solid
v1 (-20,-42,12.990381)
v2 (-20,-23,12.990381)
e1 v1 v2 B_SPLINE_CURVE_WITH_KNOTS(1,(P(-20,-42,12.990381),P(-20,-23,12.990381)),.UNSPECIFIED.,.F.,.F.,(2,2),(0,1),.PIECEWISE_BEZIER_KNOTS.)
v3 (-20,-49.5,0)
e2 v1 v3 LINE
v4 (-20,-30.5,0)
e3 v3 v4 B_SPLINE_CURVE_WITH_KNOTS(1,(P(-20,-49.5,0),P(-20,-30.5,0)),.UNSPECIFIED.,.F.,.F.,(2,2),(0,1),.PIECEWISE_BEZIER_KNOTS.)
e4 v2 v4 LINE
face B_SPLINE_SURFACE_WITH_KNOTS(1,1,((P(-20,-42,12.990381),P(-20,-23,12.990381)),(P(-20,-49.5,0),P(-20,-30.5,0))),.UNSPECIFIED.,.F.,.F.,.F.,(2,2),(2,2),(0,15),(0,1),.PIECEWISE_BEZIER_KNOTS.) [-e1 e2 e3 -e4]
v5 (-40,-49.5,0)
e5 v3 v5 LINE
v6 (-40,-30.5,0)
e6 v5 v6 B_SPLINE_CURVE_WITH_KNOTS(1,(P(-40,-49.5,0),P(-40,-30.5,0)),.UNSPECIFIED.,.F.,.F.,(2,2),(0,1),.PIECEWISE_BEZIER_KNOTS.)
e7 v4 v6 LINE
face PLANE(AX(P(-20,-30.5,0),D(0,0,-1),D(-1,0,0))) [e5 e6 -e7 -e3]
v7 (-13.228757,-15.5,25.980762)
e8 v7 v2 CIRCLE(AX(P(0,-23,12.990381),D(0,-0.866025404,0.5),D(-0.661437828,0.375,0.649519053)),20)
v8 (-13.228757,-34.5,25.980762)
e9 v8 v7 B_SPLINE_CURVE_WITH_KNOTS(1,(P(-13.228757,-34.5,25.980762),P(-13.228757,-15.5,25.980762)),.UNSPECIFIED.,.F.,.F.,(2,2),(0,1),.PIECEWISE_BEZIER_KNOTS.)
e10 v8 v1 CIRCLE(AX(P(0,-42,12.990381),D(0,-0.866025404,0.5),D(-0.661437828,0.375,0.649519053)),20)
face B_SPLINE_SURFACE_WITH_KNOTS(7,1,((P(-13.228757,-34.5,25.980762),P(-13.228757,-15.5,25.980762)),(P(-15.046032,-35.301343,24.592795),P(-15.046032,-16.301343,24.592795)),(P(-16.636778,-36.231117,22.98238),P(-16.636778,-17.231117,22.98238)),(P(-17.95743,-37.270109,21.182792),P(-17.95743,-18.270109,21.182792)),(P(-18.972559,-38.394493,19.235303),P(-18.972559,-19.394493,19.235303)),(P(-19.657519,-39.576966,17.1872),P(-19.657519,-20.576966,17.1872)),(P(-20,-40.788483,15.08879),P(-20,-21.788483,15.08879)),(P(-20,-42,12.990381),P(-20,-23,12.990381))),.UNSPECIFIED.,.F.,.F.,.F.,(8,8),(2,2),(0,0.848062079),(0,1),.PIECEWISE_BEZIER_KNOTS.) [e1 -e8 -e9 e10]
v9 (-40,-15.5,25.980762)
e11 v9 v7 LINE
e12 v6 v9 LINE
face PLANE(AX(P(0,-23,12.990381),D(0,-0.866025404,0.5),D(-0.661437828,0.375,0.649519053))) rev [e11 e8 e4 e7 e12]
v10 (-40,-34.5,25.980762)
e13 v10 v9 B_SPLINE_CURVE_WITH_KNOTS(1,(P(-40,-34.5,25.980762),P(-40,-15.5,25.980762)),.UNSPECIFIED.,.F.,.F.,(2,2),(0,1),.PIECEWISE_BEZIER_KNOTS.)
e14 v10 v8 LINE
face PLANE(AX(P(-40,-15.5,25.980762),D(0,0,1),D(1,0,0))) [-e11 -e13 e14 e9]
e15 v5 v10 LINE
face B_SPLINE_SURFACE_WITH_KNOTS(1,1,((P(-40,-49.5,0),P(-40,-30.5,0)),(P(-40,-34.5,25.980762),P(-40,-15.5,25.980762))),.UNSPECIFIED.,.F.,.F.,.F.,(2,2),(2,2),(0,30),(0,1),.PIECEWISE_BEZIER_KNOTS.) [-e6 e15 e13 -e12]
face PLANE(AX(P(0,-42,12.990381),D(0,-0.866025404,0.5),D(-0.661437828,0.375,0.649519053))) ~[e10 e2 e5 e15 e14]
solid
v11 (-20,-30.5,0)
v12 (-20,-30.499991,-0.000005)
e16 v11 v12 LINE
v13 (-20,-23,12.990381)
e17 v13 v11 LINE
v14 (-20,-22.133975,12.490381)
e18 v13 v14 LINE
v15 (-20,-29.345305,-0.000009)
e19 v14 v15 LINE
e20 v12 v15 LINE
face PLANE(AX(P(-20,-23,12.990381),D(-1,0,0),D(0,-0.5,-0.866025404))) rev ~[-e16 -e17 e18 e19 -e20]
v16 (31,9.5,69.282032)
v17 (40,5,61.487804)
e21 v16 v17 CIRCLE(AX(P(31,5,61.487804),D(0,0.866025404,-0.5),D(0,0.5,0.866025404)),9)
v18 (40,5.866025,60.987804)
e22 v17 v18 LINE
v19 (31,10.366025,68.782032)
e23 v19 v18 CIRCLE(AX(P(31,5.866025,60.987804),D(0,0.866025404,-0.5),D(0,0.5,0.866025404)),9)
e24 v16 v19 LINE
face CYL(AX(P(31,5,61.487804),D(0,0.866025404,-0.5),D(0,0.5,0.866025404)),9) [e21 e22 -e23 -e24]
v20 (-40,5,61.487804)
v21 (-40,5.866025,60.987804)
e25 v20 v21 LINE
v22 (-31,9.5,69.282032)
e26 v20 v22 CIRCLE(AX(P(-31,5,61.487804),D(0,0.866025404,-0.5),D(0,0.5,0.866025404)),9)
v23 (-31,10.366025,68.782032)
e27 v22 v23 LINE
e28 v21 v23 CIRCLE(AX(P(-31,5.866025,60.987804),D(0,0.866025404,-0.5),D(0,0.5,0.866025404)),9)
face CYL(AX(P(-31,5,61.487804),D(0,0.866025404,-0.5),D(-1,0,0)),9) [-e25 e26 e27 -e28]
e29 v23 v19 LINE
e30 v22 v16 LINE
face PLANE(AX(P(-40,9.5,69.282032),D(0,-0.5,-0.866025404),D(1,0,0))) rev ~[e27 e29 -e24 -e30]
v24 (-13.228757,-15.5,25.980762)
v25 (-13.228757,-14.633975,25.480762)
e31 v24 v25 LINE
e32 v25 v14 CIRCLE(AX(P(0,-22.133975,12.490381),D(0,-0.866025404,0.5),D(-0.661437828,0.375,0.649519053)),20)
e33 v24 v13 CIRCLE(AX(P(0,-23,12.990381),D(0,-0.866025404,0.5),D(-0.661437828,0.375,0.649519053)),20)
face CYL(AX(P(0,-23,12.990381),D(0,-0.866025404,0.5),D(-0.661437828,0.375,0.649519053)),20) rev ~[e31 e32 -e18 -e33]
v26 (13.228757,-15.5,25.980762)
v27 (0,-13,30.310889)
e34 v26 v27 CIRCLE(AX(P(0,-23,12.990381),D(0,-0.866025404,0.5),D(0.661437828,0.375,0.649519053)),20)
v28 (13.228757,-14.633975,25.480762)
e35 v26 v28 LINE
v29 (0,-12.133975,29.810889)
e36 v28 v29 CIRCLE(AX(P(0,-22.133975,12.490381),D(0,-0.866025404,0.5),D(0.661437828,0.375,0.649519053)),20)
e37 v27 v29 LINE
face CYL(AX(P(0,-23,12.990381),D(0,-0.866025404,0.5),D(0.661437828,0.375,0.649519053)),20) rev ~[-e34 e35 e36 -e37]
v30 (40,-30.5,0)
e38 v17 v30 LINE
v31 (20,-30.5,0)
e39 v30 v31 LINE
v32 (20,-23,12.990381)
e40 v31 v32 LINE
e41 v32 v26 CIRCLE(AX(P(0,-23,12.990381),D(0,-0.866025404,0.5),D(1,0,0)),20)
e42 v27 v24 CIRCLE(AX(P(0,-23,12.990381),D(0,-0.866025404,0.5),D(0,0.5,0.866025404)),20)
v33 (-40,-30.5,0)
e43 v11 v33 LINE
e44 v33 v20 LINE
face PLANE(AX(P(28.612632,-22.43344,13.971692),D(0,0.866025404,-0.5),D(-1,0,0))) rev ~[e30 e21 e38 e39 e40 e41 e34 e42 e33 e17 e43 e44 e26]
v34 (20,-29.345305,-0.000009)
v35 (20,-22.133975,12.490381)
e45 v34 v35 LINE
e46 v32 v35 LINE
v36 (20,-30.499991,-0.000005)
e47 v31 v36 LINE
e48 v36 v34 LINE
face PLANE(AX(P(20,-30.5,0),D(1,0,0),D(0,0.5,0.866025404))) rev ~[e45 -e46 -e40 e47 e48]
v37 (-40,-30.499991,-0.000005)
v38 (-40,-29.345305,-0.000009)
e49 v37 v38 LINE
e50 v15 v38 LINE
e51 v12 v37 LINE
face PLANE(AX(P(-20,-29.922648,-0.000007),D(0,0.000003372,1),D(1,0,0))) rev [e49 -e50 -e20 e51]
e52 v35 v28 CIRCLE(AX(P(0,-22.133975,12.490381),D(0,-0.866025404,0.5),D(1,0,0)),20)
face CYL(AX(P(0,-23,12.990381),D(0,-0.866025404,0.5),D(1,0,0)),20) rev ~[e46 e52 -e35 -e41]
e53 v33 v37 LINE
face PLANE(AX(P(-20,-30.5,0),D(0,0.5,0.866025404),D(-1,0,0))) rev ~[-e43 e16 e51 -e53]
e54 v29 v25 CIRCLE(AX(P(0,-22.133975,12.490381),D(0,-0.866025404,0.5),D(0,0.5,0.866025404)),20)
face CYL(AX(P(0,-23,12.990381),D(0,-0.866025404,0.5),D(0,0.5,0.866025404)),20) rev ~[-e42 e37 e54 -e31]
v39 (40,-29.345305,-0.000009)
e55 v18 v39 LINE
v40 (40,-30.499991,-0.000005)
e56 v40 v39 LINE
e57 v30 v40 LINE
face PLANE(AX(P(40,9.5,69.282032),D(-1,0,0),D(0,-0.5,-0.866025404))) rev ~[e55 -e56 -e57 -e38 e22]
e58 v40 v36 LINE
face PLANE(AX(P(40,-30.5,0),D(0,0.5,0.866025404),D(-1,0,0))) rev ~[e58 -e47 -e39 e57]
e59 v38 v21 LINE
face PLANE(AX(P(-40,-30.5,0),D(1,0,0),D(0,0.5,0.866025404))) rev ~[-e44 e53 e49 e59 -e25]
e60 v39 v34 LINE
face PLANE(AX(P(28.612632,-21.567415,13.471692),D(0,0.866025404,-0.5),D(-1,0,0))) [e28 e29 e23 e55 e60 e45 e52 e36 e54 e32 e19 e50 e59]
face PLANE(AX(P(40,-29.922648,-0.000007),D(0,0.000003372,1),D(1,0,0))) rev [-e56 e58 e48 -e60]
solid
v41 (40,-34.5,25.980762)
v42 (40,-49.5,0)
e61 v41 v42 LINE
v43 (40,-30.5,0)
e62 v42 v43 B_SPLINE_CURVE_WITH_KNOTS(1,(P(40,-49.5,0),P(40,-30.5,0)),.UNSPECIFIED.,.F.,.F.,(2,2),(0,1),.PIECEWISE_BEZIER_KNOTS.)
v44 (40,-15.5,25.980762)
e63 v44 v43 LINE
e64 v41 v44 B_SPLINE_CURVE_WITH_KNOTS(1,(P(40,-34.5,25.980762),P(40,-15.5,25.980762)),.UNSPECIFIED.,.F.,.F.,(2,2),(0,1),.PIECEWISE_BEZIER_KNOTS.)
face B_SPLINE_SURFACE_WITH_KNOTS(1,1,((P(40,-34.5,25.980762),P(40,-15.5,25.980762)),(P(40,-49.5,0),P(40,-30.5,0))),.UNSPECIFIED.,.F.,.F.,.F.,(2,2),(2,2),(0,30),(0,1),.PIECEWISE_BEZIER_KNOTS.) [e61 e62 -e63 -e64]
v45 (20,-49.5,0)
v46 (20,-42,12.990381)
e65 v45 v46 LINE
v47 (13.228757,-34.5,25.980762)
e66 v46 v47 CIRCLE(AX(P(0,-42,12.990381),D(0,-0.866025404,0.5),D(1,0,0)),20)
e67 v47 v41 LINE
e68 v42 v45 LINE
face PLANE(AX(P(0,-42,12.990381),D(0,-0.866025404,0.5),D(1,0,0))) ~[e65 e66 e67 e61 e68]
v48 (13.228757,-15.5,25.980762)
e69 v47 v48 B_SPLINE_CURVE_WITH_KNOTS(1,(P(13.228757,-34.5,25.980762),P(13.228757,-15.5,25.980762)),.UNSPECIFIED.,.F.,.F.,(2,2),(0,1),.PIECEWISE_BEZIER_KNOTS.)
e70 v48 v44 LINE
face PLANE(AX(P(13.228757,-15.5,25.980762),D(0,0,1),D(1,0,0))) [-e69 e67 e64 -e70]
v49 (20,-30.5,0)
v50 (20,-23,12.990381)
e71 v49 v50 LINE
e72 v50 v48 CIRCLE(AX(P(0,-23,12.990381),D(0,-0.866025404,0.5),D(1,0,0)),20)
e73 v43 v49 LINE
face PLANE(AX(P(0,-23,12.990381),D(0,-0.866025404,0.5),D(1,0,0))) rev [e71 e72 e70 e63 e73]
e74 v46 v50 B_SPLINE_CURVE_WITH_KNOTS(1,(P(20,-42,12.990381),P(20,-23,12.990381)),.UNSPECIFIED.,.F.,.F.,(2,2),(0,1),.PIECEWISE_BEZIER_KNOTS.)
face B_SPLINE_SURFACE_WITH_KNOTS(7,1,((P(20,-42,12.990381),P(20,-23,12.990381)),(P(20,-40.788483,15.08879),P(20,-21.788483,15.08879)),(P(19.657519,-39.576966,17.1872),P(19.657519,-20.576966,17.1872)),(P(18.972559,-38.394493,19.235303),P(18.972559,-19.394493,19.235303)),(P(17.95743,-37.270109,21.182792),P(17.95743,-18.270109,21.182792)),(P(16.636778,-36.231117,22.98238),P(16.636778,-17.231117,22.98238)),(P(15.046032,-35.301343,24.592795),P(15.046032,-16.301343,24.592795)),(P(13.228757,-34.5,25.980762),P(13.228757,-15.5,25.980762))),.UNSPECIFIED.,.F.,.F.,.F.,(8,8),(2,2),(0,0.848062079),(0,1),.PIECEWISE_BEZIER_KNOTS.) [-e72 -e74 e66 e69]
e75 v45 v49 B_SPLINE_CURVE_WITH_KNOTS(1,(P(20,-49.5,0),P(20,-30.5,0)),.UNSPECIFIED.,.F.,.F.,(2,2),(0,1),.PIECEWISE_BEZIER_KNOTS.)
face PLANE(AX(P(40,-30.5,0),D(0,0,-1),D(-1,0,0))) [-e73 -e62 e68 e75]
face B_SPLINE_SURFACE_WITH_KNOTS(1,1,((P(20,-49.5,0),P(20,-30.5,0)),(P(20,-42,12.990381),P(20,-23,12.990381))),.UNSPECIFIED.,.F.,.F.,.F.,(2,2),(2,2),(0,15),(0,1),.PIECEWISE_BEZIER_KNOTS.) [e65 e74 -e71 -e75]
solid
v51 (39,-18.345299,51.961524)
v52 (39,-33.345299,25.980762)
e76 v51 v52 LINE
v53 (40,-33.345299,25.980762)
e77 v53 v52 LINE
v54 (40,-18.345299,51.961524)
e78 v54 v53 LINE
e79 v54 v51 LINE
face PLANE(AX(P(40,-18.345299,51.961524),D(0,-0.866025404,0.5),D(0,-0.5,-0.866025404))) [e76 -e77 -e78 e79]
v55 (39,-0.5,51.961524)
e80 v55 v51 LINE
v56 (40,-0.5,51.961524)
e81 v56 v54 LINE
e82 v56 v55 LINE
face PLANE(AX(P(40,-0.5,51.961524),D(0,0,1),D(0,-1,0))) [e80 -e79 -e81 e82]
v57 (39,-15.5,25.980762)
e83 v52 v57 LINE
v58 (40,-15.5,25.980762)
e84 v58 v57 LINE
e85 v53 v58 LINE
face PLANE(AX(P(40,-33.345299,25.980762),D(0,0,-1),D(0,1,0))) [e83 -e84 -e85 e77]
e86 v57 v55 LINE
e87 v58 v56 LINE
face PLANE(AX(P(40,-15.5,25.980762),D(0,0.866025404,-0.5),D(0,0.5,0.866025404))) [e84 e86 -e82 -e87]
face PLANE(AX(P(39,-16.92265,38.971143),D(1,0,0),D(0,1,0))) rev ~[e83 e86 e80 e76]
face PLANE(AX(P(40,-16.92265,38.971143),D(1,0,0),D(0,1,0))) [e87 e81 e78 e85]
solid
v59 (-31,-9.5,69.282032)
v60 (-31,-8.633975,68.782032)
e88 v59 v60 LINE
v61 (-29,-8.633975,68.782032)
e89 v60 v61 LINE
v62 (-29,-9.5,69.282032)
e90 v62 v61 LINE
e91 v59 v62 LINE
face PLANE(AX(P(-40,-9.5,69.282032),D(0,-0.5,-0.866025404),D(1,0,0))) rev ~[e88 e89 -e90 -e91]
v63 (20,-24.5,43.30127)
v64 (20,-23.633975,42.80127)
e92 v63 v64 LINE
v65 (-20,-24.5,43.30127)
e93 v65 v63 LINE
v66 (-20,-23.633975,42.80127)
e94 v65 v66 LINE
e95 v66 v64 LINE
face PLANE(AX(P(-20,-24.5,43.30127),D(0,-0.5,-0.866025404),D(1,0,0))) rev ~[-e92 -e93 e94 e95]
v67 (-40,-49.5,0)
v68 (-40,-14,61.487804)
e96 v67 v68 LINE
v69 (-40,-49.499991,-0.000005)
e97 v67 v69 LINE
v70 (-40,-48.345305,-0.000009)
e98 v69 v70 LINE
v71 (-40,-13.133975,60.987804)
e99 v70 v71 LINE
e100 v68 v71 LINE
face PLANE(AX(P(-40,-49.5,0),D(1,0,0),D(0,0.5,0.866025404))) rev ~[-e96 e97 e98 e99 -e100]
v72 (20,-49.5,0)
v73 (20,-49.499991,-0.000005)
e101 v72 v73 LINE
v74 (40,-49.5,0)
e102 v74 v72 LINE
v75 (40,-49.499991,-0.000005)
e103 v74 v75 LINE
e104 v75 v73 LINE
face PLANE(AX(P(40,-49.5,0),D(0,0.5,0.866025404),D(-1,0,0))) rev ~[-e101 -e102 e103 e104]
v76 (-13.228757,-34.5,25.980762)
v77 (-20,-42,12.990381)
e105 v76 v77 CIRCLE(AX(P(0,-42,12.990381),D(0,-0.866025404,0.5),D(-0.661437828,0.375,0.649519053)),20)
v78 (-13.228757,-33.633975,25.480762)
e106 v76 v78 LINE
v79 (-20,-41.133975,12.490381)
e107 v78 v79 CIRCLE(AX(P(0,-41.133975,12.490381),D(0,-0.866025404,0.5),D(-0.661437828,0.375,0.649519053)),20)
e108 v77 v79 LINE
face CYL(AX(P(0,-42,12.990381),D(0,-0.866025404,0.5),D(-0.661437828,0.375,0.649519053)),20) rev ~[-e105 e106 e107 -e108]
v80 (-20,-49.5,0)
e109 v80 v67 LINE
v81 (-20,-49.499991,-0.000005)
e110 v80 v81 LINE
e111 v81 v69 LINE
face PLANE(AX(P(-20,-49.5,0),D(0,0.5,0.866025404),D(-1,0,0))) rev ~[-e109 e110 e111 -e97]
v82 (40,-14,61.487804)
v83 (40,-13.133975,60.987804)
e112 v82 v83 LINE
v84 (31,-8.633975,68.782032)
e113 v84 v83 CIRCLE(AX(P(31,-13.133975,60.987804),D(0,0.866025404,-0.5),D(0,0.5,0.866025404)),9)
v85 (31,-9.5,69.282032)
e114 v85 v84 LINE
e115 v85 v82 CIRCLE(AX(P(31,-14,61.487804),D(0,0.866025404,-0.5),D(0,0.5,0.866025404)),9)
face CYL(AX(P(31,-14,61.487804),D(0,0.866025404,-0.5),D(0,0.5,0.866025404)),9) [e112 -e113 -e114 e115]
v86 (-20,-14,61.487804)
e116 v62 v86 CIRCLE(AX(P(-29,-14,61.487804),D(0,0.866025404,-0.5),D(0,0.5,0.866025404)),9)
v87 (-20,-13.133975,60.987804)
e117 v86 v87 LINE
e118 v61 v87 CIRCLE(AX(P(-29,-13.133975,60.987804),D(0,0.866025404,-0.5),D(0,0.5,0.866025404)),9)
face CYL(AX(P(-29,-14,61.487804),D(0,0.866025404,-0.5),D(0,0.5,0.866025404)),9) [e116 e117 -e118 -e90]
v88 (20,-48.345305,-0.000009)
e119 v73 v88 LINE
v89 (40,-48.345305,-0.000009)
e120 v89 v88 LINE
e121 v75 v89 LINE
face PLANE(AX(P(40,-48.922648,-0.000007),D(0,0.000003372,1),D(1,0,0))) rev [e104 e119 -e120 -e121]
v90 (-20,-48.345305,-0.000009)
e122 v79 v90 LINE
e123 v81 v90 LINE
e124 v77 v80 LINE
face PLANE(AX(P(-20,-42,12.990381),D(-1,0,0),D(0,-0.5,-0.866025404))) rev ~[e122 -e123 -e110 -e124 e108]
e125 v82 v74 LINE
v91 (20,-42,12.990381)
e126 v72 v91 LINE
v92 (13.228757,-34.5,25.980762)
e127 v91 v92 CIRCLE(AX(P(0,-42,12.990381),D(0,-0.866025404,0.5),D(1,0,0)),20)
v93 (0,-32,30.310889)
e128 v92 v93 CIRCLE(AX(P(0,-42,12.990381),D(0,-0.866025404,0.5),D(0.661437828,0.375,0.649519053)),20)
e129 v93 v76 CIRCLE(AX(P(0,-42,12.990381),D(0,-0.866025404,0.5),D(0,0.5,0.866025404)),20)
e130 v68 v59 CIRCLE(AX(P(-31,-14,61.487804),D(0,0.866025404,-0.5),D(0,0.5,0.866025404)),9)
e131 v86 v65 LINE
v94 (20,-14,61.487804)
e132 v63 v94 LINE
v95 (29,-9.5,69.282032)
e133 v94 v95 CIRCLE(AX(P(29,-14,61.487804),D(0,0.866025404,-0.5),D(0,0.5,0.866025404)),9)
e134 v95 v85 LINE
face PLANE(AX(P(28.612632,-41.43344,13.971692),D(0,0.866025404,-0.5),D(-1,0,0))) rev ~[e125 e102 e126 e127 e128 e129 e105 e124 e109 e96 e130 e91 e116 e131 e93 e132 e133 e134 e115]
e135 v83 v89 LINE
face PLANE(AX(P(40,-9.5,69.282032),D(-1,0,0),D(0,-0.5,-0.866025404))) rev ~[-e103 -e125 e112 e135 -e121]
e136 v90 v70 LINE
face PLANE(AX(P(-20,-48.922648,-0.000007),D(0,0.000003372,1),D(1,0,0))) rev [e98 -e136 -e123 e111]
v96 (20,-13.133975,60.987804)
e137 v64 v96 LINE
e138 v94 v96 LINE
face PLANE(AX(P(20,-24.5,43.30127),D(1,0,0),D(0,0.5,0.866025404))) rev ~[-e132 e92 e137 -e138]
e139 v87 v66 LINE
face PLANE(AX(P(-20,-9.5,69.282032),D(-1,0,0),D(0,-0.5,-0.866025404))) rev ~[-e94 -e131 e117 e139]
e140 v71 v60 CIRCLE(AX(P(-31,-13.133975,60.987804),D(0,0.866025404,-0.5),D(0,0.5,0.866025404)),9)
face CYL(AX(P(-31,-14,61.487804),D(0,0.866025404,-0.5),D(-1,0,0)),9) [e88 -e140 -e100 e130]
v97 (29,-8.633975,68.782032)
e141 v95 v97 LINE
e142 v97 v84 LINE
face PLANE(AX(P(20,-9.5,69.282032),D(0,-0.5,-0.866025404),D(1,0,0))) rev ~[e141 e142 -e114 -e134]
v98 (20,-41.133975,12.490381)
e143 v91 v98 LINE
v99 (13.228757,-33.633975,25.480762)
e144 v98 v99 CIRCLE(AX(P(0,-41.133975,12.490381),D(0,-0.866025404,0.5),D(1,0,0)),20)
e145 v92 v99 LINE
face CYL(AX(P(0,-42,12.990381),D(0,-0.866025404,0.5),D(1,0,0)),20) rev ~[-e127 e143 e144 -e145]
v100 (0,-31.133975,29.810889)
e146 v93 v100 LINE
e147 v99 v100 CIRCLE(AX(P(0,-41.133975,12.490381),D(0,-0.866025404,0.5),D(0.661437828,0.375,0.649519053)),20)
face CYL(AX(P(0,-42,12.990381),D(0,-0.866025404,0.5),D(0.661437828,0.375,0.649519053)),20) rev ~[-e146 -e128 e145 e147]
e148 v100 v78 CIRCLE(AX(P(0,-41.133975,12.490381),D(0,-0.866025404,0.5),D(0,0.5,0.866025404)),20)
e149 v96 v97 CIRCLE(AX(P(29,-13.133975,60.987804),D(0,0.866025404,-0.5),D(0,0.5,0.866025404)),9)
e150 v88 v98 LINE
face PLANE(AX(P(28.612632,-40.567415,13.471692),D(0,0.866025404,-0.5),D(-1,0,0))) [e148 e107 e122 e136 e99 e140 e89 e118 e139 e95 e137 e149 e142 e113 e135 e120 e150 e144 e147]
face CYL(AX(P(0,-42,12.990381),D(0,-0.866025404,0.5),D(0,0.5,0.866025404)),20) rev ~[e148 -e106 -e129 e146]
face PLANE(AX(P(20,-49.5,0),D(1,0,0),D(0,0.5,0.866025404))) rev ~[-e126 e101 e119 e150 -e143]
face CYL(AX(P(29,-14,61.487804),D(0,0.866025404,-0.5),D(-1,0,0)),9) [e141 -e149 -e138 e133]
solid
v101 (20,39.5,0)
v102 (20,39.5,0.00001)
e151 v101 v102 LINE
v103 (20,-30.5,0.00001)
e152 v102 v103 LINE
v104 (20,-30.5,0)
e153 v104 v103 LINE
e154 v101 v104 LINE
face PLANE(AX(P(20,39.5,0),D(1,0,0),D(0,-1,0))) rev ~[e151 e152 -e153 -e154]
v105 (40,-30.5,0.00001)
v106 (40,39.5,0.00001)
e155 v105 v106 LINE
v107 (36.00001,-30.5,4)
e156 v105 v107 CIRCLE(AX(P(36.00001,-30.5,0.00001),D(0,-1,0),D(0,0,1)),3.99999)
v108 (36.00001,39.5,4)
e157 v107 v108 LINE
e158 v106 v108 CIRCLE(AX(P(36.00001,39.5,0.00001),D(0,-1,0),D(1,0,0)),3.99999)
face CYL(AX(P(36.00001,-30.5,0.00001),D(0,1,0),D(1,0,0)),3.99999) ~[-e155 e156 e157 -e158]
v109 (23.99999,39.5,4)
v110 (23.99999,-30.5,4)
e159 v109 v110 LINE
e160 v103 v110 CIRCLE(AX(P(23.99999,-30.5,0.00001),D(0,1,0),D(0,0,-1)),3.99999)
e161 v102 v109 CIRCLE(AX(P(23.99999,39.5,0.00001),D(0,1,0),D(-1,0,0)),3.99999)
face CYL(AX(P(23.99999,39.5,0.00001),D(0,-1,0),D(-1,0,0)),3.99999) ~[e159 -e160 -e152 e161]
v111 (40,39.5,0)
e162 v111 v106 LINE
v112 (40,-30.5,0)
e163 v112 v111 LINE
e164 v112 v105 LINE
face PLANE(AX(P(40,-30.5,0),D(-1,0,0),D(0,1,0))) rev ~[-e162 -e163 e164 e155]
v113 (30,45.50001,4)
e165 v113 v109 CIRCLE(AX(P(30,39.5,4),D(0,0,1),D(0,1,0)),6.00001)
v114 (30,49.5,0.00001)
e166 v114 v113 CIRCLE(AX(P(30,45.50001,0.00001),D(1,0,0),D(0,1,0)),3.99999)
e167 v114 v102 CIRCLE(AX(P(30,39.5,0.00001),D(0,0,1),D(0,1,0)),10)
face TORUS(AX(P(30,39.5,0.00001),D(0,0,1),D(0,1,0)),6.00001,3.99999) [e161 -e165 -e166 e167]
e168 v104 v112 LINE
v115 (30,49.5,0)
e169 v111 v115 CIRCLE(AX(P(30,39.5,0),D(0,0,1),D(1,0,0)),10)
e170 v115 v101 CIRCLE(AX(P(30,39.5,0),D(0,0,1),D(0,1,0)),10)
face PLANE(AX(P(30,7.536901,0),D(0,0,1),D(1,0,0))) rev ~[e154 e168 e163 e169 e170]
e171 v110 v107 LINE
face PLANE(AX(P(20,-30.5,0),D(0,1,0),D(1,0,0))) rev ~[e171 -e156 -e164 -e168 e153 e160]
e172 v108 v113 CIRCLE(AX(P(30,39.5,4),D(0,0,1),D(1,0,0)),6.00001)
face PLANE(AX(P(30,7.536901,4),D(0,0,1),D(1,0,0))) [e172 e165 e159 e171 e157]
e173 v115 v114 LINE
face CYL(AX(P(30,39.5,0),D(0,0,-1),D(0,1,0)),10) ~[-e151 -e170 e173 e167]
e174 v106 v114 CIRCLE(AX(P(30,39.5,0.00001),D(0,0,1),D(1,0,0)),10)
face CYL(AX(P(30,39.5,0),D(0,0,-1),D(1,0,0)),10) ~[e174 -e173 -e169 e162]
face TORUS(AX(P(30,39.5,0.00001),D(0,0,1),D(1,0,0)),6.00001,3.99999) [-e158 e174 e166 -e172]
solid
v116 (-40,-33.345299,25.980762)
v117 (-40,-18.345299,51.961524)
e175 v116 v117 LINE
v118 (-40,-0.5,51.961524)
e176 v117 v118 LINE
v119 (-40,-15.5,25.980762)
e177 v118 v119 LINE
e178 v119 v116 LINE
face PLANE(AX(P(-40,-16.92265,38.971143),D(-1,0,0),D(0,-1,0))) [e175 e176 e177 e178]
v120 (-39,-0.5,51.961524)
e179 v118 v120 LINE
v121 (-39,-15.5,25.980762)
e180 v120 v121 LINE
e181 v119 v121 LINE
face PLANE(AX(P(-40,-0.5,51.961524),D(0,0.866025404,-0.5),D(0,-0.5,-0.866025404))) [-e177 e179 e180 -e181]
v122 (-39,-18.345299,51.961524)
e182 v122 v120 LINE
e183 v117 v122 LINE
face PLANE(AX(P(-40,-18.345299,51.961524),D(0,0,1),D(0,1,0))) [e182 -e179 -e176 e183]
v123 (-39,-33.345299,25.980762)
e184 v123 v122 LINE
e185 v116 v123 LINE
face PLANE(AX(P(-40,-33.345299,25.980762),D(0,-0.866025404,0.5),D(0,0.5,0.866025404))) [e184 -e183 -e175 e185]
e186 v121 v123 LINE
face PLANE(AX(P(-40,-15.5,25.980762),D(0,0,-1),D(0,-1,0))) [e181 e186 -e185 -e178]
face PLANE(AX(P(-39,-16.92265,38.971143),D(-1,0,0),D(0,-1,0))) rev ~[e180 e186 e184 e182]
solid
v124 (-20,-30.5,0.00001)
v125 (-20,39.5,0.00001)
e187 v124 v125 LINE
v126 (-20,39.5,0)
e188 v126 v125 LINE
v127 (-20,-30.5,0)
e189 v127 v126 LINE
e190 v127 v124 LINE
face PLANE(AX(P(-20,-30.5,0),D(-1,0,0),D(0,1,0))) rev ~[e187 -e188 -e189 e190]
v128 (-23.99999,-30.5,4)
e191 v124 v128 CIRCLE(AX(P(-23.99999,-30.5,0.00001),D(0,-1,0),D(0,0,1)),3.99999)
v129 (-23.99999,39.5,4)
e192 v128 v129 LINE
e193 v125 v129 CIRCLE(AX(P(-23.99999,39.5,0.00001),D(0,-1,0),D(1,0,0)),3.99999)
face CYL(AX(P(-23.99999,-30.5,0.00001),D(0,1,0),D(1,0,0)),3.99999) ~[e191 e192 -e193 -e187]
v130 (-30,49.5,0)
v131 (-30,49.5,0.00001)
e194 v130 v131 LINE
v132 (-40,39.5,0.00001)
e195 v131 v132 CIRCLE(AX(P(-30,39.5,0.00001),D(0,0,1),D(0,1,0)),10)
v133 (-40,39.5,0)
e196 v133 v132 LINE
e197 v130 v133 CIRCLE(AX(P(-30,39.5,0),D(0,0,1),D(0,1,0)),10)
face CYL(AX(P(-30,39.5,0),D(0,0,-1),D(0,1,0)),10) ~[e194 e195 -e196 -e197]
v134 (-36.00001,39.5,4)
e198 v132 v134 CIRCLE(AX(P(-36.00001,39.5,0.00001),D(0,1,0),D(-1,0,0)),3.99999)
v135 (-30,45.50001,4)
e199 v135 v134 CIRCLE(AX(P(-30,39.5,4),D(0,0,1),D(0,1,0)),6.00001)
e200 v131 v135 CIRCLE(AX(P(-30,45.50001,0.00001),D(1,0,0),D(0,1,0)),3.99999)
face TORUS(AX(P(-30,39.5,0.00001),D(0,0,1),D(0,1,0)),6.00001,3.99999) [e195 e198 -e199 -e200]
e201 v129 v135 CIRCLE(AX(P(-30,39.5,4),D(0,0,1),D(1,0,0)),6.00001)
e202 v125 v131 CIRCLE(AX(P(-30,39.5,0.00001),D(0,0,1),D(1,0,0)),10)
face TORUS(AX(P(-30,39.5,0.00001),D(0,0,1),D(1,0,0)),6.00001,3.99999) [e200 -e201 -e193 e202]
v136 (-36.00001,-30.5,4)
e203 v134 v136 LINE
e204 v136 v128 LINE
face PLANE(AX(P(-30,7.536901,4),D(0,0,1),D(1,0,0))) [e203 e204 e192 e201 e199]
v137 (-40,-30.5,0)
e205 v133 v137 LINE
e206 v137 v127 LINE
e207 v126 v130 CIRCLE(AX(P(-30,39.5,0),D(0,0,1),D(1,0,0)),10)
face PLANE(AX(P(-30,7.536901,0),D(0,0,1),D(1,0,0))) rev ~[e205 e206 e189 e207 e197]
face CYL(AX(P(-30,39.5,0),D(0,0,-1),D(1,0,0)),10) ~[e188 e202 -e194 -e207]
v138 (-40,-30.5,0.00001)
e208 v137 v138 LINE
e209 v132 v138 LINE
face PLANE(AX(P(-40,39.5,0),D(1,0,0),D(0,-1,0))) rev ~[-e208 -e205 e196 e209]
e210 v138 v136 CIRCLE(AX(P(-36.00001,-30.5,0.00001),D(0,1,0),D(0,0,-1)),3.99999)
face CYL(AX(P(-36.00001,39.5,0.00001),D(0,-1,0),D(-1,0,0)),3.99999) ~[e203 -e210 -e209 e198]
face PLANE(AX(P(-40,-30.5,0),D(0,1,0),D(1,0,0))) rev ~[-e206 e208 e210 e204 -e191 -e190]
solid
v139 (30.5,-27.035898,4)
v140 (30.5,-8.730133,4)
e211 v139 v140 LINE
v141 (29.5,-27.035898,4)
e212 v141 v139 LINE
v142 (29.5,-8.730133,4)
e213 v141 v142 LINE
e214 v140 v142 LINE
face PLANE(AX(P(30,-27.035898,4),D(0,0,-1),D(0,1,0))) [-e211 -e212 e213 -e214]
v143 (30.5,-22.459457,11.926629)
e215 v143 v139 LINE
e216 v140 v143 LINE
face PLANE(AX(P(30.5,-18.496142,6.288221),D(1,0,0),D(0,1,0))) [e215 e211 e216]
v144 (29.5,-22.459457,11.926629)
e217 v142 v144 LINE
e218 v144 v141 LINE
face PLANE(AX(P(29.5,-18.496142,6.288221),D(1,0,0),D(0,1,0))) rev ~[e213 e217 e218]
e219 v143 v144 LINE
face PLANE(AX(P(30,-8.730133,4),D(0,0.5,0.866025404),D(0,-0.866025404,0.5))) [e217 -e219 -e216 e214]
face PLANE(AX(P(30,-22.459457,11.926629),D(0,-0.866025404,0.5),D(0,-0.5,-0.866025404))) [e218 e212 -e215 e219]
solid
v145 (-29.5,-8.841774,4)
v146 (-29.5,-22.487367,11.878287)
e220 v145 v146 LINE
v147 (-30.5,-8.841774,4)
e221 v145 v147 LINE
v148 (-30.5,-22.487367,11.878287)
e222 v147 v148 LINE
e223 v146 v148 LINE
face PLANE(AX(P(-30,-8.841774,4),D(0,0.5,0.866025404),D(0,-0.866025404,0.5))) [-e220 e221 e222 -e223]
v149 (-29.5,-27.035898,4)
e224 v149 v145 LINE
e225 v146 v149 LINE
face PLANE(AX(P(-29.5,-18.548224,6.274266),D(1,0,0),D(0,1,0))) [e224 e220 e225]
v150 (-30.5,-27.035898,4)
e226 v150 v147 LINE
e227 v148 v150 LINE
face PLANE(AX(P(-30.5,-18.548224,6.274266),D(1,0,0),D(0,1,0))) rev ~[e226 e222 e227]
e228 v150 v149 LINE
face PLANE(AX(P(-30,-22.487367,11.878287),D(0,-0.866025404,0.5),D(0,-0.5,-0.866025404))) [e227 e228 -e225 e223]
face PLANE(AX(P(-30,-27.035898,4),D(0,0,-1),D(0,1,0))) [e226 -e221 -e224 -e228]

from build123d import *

# Parameters (mm, degrees)
F5_DEPTH    = 4
F6_DEPTH    = 1
F7_DEPTH    = 1
F10_R       = 9
F10_2_R     = 9
F11_R       = 3.99999
F11_2_R     = 3.99999
F15_DEPTH   = 1
F17_DEPTH   = 1
F20_DEPTH   = 0.5
F21_SIZE2   = 0.57734
F21_SIZE    = 0.99999
F22_SIZE2   = 0.57734
F22_SIZE    = 0.99999
F22_2_SIZE2 = 0.57734
F22_2_SIZE  = 0.99999
F22_3_SIZE2 = 0.57734
F22_3_SIZE  = 0.99999
F25_DEPTH   = 0.5


# Not quite as in the source:
# - a fillet or chamfer is up to 0.001 mm smaller than in the source, because OpenCascade refuses the exact size
# - a feature names something its author has since deleted; it is built from what else it names


with BuildPart() as f5:
    # F0 (on Top) → F5 (new body)
    with BuildSketch(Plane.XY):
        with BuildLine():
            Line((20, 39.5), (20, -30.5))
            Line((20, -30.5), (40, -30.5))
            Line((40, -30.5), (40, 39.5))
            ThreePointArc((40, 39.5), (37.0710678119, 46.5710678119), (30, 49.5))
            ThreePointArc((30, 49.5), (22.9289321881, 46.5710678119), (20, 39.5))
        make_face()
    extrude(amount=F5_DEPTH)

    # F11 (radius 4 in the source; OpenCascade refuses exactly that, so slightly less here)
    f11_edges = [f5.edges().sort_by_distance(p)[0] for p in [
        (20, 4.5, 4),
        (40, 4.5, 4),
        (30, 49.5, 4),
    ]]
    fillet(f11_edges, radius=F11_R)


with BuildPart() as f5b:
    # F0 (on Top) → F5, piece 2 (new body)
    with BuildSketch(Plane.XY):
        with BuildLine():
            Line((-40, 39.5), (-40, -30.5))
            Line((-40, -30.5), (-20, -30.5))
            Line((-20, -30.5), (-20, 39.5))
            ThreePointArc((-20, 39.5), (-22.9289321881, 46.5710678119), (-30, 49.5))
            ThreePointArc((-30, 49.5), (-37.0710678119, 46.5710678119), (-40, 39.5))
        make_face()
    extrude(amount=F5_DEPTH)

    # F11#2 (radius 4 in the source; OpenCascade refuses exactly that, so slightly less here)
    f11_2_edges = [f5b.edges().sort_by_distance(p)[0] for p in [
        (-40, 4.5, 4),
        (-20, 4.5, 4),
        (-30, 49.5, 4),
    ]]
    fillet(f11_2_edges, radius=F11_2_R)


with BuildPart() as f6:
    # F4 (on line) → F6 (new body)
    with BuildSketch(Plane(origin=(0, -37.125, 21.4341287437), x_dir=(-1, 0, 0), z_dir=(0, 0.8660254038, -0.5))):
        with BuildLine():
            Line((-40, -24.75), (-20, -24.75))
            Line((-20, -24.75), (-20, -9.75))
            ThreePointArc((-20, -9.75), (-18.2287565553, -1.5212434447), (-13.2287565553, 5.25))
            Line((-13.2287565553, 5.25), (-40, 5.25))
            Line((-40, 5.25), (-40, -24.75))
        make_face()
        with BuildLine():
            Line((13.2287565553, 5.25), (40, 5.25))
            Line((40, 5.25), (40, 55.25))
            Line((40, 55.25), (20, 55.25))
            Line((20, 55.25), (20, 25.25))
            Line((20, 25.25), (-20, 25.25))
            Line((-20, 25.25), (-20, 55.25))
            Line((-20, 55.25), (-40, 55.25))
            Line((-40, 55.25), (-40, 5.25))
            Line((-40, 5.25), (-13.2287565553, 5.25))
            ThreePointArc((-13.2287565553, 5.25), (-7.0710678119, 8.9582869339), (0, 10.25))
            ThreePointArc((0, 10.25), (7.0710678119, 8.9582869339), (13.2287565553, 5.25))
        make_face()
        with BuildLine():
            Line((20, -24.75), (40, -24.75))
            Line((40, -24.75), (40, 5.25))
            Line((40, 5.25), (13.2287565553, 5.25))
            ThreePointArc((13.2287565553, 5.25), (18.2287565553, -1.5212434447), (20, -9.75))
            Line((20, -9.75), (20, -24.75))
        make_face()
    extrude(amount=F6_DEPTH)

    # F10
    f10_edges = [f6.edges().sort_by_distance(p)[0] for p in [
        (-40, -9.066987, 69.032032),
        (-20, -9.066987, 69.032032),
        (40, -9.066987, 69.032032),
        (20, -9.066987, 69.032032),
    ]]
    fillet(f10_edges, radius=F10_R)

    # F22#2 (size 1 and 0.5773502692 in the source; OpenCascade refuses exactly that, so slightly less here)
    f22_2_edges = [f6.edges().sort_by_distance(p)[0] for p in [
        (30, -48.633975, -0.5),
    ]]
    f22_2_side = f6.faces().sort_by_distance((30, -49.066987, -0.25))[0]
    chamfer(f22_2_edges, length=F22_2_SIZE, length2=F22_2_SIZE2, reference=f22_2_side)

    # F22#3 (size 1 and 0.5773502692 in the source; OpenCascade refuses exactly that, so slightly less here)
    f22_3_edges = [f6.edges().sort_by_distance(p)[0] for p in [
        (-30, -48.633975, -0.5),
    ]]
    f22_3_side = f6.faces().sort_by_distance((-30, -49.066987, -0.25))[0]
    chamfer(f22_3_edges, length=F22_3_SIZE, length2=F22_3_SIZE2, reference=f22_3_side)


with BuildPart() as f7:
    # F3 (on line) → F7 (new body)
    with BuildSketch(Plane(origin=(0, -22.875, 13.2068874077), x_dir=(-1, 0, 0), z_dir=(0, 0.8660254038, -0.5))):
        with BuildLine():
            Line((-40, -15.25), (-20, -15.25))
            Line((-20, -15.25), (-20, -0.25))
            ThreePointArc((-20, -0.25), (-18.2287565553, 7.9787565553), (-13.2287565553, 14.75))
            Line((-13.2287565553, 14.75), (-40, 14.75))
            Line((-40, 14.75), (-40, -15.25))
        make_face()
        with BuildLine():
            Line((20, -15.25), (40, -15.25))
            Line((40, -15.25), (40, 14.75))
            Line((40, 14.75), (13.2287565553, 14.75))
            ThreePointArc((13.2287565553, 14.75), (18.2287565553, 7.9787565553), (20, -0.25))
            Line((20, -0.25), (20, -15.25))
        make_face()
        with BuildLine():
            Line((13.2287565553, 14.75), (40, 14.75))
            Line((40, 14.75), (40, 64.75))
            Line((40, 64.75), (-40, 64.75))
            Line((-40, 64.75), (-40, 14.75))
            Line((-40, 14.75), (-13.2287565553, 14.75))
            ThreePointArc((-13.2287565553, 14.75), (-7.0710678119, 18.4582869339), (0, 19.75))
            ThreePointArc((0, 19.75), (7.0710678119, 18.4582869339), (13.2287565553, 14.75))
        make_face()
    extrude(amount=F7_DEPTH)

    # F10#2
    f10_2_edges = [f7.edges().sort_by_distance(p)[0] for p in [
        (40, 9.933013, 69.032032),
        (-40, 9.933013, 69.032032),
    ]]
    fillet(f10_2_edges, radius=F10_2_R)

    # F21 (size 1 and 0.5773502692 in the source; OpenCascade refuses exactly that, so slightly less here)
    f21_edges = [f7.edges().sort_by_distance(p)[0] for p in [
        (30, -29.633975, -0.5),
    ]]
    f21_side = f7.faces().sort_by_distance((30, -30.066987, -0.25))[0]
    chamfer(f21_edges, length=F21_SIZE, length2=F21_SIZE2, reference=f21_side)

    # F22 (size 1 and 0.5773502692 in the source; OpenCascade refuses exactly that, so slightly less here)
    f22_edges = [f7.edges().sort_by_distance(p)[0] for p in [
        (-30, -29.633975, -0.5),
    ]]
    f22_side = f7.faces().sort_by_distance((-30, -30.066987, -0.25))[0]
    chamfer(f22_edges, length=F22_SIZE, length2=F22_SIZE2, reference=f22_side)


with BuildPart() as f8:
    # F4 (on line) → F8 section 0
    with BuildSketch(Plane(origin=(0, -37.125, 21.4341287437), x_dir=(-1, 0, 0), z_dir=(0, 0.8660254038, -0.5))):
        with BuildLine():
            Line((-40, -24.75), (-20, -24.75))
            Line((-20, -24.75), (-20, -9.75))
            ThreePointArc((-20, -9.75), (-18.2287565553, -1.5212434447), (-13.2287565553, 5.25))
            Line((-13.2287565553, 5.25), (-40, 5.25))
            Line((-40, 5.25), (-40, -24.75))
        make_face()
    # F3 (on line) → F8 section 1
    with BuildSketch(Plane(origin=(0, -22.875, 13.2068874077), x_dir=(-1, 0, 0), z_dir=(0, 0.8660254038, -0.5))):
        with BuildLine():
            Line((-40, -15.25), (-20, -15.25))
            Line((-20, -15.25), (-20, -0.25))
            ThreePointArc((-20, -0.25), (-18.2287565553, 7.9787565553), (-13.2287565553, 14.75))
            Line((-13.2287565553, 14.75), (-40, 14.75))
            Line((-40, 14.75), (-40, -15.25))
        make_face()
    loft()


with BuildPart() as f9:
    # F4 (on line) → F9 section 0
    with BuildSketch(Plane(origin=(0, -37.125, 21.4341287437), x_dir=(-1, 0, 0), z_dir=(0, 0.8660254038, -0.5))):
        with BuildLine():
            Line((20, -24.75), (40, -24.75))
            Line((40, -24.75), (40, 5.25))
            Line((40, 5.25), (13.2287565553, 5.25))
            ThreePointArc((13.2287565553, 5.25), (18.2287565553, -1.5212434447), (20, -9.75))
            Line((20, -9.75), (20, -24.75))
        make_face()
    # F3 (on line) → F9 section 1
    with BuildSketch(Plane(origin=(0, -22.875, 13.2068874077), x_dir=(-1, 0, 0), z_dir=(0, 0.8660254038, -0.5))):
        with BuildLine():
            Line((20, -15.25), (40, -15.25))
            Line((40, -15.25), (40, 14.75))
            Line((40, 14.75), (13.2287565553, 14.75))
            ThreePointArc((13.2287565553, 14.75), (18.2287565553, 7.9787565553), (20, -0.25))
            Line((20, -0.25), (20, -15.25))
        make_face()
    loft()


with BuildPart() as f15:
    # F14 (on face) → F15 (new body)
    with BuildSketch(Plane(origin=(-40, 0, 0), x_dir=(0, -1, 0), z_dir=(-1, 0, 0))):
        Polygon((15.5, 25.9807621135), (33.3452994616, 25.9807621135), (18.3452994616, 51.9615242271), (0.5, 51.9615242271), align=None)
    extrude(amount=-F15_DEPTH)


with BuildPart() as f17:
    # F16 (on offset) → F17 (new body)
    with BuildSketch(Plane.YZ.offset(40)):
        Polygon((-18.3452994616, 51.9615242271), (-33.3452994616, 25.9807621135), (-15.5, 25.9807621135), (-0.5, 51.9615242271), align=None)
    extrude(amount=-F17_DEPTH)


with BuildPart() as f20:
    # F19 (on line) → F20 (new body, symmetric)
    with BuildSketch(Plane.YZ.offset(30)):
        Polygon((-22.4594569975, 11.9266290008), (-27.0358983849, 4), (-8.7301328353, 4), align=None)
    extrude(amount=F20_DEPTH, both=True)


with BuildPart() as f25:
    # F24 (on line) → F25 (new body, symmetric)
    with BuildSketch(Plane.YZ.offset(-30)):
        Polygon((-22.4873672427, 11.878287038), (-27.0358983849, 4), (-8.8417738163, 4), align=None)
    extrude(amount=F25_DEPTH, both=True)


solid = Compound([f5.part, f5b.part, f6.part, f7.part, f8.part, f9.part, f15.part, f17.part, f20.part, f25.part])
